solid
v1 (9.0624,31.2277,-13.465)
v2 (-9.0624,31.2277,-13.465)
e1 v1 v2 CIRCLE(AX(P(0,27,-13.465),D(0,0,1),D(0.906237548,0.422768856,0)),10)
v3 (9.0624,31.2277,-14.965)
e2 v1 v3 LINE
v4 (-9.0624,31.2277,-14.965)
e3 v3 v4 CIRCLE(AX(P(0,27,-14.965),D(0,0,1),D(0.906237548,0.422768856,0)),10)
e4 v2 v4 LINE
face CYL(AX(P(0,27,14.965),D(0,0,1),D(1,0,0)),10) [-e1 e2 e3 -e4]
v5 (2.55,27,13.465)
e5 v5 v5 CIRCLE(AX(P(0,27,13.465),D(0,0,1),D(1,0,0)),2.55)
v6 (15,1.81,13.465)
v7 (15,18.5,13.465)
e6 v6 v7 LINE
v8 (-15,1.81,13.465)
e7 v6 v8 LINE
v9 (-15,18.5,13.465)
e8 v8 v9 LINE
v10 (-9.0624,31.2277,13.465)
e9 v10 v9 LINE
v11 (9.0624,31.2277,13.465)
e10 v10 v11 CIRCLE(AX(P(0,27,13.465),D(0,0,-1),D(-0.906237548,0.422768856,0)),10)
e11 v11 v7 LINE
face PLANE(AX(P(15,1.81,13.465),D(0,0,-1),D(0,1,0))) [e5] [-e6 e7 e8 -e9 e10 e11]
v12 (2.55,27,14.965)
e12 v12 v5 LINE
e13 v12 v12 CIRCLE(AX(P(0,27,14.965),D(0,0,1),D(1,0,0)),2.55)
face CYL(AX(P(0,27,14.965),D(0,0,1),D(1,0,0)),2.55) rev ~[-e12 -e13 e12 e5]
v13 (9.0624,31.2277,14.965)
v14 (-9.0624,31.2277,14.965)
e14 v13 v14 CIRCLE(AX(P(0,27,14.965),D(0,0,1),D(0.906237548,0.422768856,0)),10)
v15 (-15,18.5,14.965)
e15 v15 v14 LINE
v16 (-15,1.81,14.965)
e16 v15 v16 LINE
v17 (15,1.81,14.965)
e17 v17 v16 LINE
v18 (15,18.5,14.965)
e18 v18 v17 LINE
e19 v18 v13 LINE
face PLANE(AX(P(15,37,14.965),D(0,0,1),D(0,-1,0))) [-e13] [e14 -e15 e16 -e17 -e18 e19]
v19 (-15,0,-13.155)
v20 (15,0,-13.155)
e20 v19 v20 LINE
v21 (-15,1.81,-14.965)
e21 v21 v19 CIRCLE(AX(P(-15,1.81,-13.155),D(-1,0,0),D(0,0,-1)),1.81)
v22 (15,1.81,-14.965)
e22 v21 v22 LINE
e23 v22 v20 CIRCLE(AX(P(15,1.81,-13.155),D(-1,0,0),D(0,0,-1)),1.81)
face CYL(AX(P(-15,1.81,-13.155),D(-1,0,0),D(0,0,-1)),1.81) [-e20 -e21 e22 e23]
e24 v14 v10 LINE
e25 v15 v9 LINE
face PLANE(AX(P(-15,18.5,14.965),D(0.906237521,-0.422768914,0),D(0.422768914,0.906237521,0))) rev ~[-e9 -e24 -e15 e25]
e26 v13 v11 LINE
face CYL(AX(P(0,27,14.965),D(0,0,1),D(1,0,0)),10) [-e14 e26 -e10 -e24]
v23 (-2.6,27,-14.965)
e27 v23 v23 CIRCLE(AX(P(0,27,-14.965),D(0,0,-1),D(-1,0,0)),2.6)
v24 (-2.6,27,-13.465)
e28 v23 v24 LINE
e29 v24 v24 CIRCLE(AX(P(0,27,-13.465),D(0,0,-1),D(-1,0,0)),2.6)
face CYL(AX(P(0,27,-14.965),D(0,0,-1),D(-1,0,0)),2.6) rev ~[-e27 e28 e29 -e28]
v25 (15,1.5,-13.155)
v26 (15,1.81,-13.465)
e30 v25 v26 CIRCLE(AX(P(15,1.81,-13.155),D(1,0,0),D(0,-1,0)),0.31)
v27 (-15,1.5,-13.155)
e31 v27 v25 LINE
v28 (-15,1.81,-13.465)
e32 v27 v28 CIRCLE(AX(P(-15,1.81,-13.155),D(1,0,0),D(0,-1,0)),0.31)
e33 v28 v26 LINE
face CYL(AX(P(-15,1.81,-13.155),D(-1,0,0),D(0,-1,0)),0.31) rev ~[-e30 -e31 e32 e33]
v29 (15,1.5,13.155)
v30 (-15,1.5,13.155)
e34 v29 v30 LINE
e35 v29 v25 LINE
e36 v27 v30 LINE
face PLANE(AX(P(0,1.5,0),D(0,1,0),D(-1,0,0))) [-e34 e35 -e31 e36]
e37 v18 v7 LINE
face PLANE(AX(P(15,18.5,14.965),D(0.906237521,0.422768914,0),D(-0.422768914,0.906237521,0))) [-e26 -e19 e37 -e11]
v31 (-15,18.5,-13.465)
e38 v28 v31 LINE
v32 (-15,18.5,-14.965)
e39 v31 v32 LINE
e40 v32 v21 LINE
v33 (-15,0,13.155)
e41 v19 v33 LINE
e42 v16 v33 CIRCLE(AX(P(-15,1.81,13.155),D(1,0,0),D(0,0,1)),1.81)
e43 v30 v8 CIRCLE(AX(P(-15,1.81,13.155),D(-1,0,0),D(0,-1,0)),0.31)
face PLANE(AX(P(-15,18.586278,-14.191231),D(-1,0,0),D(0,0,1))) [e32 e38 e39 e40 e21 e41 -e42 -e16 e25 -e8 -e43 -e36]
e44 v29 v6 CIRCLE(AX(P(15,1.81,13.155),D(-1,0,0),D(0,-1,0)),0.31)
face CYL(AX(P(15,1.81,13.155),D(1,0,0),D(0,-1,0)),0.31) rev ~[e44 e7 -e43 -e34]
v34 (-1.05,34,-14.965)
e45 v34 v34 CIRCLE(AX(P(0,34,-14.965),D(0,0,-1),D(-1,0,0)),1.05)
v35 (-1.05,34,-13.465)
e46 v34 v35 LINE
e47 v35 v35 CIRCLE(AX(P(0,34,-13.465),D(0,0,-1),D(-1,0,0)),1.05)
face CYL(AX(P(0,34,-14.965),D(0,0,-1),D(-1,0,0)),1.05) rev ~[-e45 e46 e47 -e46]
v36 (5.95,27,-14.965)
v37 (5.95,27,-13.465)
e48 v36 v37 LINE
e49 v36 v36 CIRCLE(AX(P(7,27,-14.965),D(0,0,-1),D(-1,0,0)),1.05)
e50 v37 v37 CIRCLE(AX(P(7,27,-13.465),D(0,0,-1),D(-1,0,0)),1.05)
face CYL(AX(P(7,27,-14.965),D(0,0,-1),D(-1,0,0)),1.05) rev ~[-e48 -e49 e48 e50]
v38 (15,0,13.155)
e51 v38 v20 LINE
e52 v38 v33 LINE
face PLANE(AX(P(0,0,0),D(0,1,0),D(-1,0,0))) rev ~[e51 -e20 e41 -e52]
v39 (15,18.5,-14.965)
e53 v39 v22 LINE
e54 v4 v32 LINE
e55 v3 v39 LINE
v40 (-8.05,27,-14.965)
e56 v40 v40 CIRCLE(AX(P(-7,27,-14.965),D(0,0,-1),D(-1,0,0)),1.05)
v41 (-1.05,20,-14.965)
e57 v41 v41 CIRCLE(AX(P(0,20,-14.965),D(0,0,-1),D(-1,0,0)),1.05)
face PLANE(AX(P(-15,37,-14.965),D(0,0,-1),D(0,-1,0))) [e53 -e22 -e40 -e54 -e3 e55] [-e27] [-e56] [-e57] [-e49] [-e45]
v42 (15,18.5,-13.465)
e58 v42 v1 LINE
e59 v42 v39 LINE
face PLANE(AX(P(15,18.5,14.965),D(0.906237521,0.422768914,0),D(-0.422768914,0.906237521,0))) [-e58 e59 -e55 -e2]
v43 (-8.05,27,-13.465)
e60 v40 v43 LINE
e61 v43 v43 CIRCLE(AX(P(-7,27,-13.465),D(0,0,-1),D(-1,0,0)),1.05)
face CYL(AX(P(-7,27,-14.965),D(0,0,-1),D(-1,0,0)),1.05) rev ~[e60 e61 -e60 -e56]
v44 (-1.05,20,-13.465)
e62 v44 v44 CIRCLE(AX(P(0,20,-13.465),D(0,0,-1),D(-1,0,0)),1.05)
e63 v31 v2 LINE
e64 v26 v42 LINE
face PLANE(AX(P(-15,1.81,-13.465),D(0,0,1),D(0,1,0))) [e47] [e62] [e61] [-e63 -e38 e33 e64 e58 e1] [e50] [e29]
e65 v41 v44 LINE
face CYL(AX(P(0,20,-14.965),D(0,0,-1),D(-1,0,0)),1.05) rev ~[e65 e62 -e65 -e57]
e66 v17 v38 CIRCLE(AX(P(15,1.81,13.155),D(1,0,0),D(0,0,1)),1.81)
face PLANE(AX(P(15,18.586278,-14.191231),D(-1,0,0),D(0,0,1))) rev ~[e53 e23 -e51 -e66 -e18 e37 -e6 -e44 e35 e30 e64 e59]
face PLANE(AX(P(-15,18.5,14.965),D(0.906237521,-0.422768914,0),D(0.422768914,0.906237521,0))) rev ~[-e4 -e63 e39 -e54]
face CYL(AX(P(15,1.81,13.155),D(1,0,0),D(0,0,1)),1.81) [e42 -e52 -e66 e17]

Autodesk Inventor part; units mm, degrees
ref_plane "YZ Plane" through (0, 0, 0) normal (1, 0, 0) x (0, 1, 0)
ref_plane "XZ Plane" through (0, 0, 0) normal (0, 1, 0) x (-1, 0, 0)
ref_plane "XY Plane" through (0, 0, 0) normal (0, 0, 1) x (1, 0, 0)
sketch "Sketch1" plane through (0, 0, 0) normal (0, 1, 0) x (-1, 0, 0)
  line L0 (15, 14.965) -> (-15, 14.965)
  line L1 (-15, 14.965) -> (-15, -14.965)
  line L2 (-15, -14.965) -> (15, -14.965)
  line L3 (15, -14.965) -> (15, 14.965)
  point P0 (0, 0)
  dimension "d0" = 29.93
  dimension "d1" = 30
  dimension "d2" = 15
  dimension "d3" = 14.965
extrude "Plate1" add sketch "Sketch1" along normal blind 1.5
sketch "Sketch2" plane through (-15, 0, -13.465) normal (0, 0, -1) x (-1, 0, 0)
  line L0 (-30, 0) -> (0, 0)
  line L1 (0, 0) -> (0, 37)
  line L2 (0, 37) -> (-30, 37)
  line L3 (-30, 37) -> (-30, 0)
edge flange "Flange1" height 37 angle 90 thickness 1.5 bend radius 0.31 thickness toward (0, 0, -1) relief tear relief width 1.5 relief depth 0.75 corner gap 0.31 corner form 0 edges at (0, 1.5, -14.965) (0, 1.5, 14.965) wall of the first edge with corners at (15, 0, -13.465) (-15, 0, -13.465) (-15, 37, -13.465) (15, 37, -13.465)
bend "Bend1"
corner "Corner1"
sketch "Sketch3" plane through (-15, 37, 14.965) normal (0, 0, 1) x (1, 0, 0)
  line L0 (0, 0) -> (30, 0) projected
  line L1 (0, -35.19) -> (0, 0) projected
  circle A0 centre (15, -10) radius 10
  line L2 (0, -18.5) -> (30, -18.5)
  line L3 (30, -18.5) -> (30, -28.5)
  line L4 (30, -28.5) -> (0, -28.5)
  line L5 (0, -28.5) -> (0, -18.5)
  line L6 (30, -18.5) -> (24.0624, -5.7723)
  line L7 (0, -18.5) -> (5.9376, -5.7723)
  line L8 (0, 0) -> (30, 0)
  line L9 (30, 0) -> (30, -25)
  line L10 (30, -25) -> (0, -25)
  line L11 (0, -25) -> (0, 0)
  point P0 (15, -37)
  point P1 (15, 0)
  dimension "d15" = 10
  dimension "d16" = 0
  dimension "d17" = 20
  dimension "d18" = 8.5
  dimension "d19" = 0
  dimension "d20" = 30
  dimension "d21" = 10
  dimension "d22" = 25
extrude "Extrusion1" cut sketch "Sketch3" against normal blind 35 contours L0 A0 L7 L1 | L0 L9 L6 A0
sketch "Sketch4" plane through (15, 1.81, -14.965) normal (0, 0, -1) x (-1, 0, 0)
  arc A0 (24.0624, 29.4177) -> (5.9376, 29.4177) centre (15, 25.19) ccw projected
  circle A1 centre (15, 25.19) radius 2.6
  circle A2 centre (8, 25.19) radius 1.05
  circle A3 centre (22, 25.19) radius 1.05
  circle A4 centre (15, 32.19) radius 1.05
  circle A5 centre (15, 18.19) radius 1.05
  point P0 (15, -1.81)
  dimension "d25" = 5.2
  dimension "d26" = 0
  dimension "d27" = 7
  dimension "d28" = 2.1
  dimension "d29" = 7
  dimension "d30" = 0
  dimension "d31" = 2.1
  dimension "d32" = 0
  dimension "d33" = 7
  dimension "d34" = 2.1
  dimension "d35" = 7
  dimension "d36" = 0
  dimension "d37" = 2.1
extrude "Extrusion2" cut sketch "Sketch4" against normal blind 1.5
sketch "Sketch5" plane through (-15, 1.81, 14.965) normal (0, 0, 1) x (1, 0, 0)
  arc A0 (24.0624, 29.4177) -> (5.9376, 29.4177) centre (15, 25.19) ccw projected
  circle A1 centre (15, 25.19) radius 2.55
  point P0 (15, -1.81)
  dimension "d40" = 5.1
extrude "Extrusion3" cut sketch "Sketch5" against normal blind 1.5
equation "\"d4\" = Thickness"
equation "\"d5\" = BendReliefWidth"
equation "\"d6\" = BendReliefDepth"
equation "\"d7\" = MinimumRemnant"
equation "\"d8\" = TransitionRadius"
equation "\"d11\" = BendRadius"
equation "\"d12\" = CornerReliefSize"
equation "\"d13\" = GapSize"
equation "\"d14\" = JacobiRadiusSize"
equation "\"BendReliefWidth\" = Thickness"
equation "\"BendReliefDepth\" = 0.5 * Thickness"
equation "\"CornerReliefSize\" = 4 * Thickness"
equation "\"MinimumRemnant\" = 2 * Thickness"
equation "\"TransitionRadius\" = BendRadius"
equation "\"JacobiRadiusSize\" = BendRadius"
equation "\"GapSize\" = Thickness"
equation "\"Thickness\" = 1.5"
equation "\"BendRadius\" = 0.31"
properties part number "partpart" material "Aluminum 6061-AHC"
